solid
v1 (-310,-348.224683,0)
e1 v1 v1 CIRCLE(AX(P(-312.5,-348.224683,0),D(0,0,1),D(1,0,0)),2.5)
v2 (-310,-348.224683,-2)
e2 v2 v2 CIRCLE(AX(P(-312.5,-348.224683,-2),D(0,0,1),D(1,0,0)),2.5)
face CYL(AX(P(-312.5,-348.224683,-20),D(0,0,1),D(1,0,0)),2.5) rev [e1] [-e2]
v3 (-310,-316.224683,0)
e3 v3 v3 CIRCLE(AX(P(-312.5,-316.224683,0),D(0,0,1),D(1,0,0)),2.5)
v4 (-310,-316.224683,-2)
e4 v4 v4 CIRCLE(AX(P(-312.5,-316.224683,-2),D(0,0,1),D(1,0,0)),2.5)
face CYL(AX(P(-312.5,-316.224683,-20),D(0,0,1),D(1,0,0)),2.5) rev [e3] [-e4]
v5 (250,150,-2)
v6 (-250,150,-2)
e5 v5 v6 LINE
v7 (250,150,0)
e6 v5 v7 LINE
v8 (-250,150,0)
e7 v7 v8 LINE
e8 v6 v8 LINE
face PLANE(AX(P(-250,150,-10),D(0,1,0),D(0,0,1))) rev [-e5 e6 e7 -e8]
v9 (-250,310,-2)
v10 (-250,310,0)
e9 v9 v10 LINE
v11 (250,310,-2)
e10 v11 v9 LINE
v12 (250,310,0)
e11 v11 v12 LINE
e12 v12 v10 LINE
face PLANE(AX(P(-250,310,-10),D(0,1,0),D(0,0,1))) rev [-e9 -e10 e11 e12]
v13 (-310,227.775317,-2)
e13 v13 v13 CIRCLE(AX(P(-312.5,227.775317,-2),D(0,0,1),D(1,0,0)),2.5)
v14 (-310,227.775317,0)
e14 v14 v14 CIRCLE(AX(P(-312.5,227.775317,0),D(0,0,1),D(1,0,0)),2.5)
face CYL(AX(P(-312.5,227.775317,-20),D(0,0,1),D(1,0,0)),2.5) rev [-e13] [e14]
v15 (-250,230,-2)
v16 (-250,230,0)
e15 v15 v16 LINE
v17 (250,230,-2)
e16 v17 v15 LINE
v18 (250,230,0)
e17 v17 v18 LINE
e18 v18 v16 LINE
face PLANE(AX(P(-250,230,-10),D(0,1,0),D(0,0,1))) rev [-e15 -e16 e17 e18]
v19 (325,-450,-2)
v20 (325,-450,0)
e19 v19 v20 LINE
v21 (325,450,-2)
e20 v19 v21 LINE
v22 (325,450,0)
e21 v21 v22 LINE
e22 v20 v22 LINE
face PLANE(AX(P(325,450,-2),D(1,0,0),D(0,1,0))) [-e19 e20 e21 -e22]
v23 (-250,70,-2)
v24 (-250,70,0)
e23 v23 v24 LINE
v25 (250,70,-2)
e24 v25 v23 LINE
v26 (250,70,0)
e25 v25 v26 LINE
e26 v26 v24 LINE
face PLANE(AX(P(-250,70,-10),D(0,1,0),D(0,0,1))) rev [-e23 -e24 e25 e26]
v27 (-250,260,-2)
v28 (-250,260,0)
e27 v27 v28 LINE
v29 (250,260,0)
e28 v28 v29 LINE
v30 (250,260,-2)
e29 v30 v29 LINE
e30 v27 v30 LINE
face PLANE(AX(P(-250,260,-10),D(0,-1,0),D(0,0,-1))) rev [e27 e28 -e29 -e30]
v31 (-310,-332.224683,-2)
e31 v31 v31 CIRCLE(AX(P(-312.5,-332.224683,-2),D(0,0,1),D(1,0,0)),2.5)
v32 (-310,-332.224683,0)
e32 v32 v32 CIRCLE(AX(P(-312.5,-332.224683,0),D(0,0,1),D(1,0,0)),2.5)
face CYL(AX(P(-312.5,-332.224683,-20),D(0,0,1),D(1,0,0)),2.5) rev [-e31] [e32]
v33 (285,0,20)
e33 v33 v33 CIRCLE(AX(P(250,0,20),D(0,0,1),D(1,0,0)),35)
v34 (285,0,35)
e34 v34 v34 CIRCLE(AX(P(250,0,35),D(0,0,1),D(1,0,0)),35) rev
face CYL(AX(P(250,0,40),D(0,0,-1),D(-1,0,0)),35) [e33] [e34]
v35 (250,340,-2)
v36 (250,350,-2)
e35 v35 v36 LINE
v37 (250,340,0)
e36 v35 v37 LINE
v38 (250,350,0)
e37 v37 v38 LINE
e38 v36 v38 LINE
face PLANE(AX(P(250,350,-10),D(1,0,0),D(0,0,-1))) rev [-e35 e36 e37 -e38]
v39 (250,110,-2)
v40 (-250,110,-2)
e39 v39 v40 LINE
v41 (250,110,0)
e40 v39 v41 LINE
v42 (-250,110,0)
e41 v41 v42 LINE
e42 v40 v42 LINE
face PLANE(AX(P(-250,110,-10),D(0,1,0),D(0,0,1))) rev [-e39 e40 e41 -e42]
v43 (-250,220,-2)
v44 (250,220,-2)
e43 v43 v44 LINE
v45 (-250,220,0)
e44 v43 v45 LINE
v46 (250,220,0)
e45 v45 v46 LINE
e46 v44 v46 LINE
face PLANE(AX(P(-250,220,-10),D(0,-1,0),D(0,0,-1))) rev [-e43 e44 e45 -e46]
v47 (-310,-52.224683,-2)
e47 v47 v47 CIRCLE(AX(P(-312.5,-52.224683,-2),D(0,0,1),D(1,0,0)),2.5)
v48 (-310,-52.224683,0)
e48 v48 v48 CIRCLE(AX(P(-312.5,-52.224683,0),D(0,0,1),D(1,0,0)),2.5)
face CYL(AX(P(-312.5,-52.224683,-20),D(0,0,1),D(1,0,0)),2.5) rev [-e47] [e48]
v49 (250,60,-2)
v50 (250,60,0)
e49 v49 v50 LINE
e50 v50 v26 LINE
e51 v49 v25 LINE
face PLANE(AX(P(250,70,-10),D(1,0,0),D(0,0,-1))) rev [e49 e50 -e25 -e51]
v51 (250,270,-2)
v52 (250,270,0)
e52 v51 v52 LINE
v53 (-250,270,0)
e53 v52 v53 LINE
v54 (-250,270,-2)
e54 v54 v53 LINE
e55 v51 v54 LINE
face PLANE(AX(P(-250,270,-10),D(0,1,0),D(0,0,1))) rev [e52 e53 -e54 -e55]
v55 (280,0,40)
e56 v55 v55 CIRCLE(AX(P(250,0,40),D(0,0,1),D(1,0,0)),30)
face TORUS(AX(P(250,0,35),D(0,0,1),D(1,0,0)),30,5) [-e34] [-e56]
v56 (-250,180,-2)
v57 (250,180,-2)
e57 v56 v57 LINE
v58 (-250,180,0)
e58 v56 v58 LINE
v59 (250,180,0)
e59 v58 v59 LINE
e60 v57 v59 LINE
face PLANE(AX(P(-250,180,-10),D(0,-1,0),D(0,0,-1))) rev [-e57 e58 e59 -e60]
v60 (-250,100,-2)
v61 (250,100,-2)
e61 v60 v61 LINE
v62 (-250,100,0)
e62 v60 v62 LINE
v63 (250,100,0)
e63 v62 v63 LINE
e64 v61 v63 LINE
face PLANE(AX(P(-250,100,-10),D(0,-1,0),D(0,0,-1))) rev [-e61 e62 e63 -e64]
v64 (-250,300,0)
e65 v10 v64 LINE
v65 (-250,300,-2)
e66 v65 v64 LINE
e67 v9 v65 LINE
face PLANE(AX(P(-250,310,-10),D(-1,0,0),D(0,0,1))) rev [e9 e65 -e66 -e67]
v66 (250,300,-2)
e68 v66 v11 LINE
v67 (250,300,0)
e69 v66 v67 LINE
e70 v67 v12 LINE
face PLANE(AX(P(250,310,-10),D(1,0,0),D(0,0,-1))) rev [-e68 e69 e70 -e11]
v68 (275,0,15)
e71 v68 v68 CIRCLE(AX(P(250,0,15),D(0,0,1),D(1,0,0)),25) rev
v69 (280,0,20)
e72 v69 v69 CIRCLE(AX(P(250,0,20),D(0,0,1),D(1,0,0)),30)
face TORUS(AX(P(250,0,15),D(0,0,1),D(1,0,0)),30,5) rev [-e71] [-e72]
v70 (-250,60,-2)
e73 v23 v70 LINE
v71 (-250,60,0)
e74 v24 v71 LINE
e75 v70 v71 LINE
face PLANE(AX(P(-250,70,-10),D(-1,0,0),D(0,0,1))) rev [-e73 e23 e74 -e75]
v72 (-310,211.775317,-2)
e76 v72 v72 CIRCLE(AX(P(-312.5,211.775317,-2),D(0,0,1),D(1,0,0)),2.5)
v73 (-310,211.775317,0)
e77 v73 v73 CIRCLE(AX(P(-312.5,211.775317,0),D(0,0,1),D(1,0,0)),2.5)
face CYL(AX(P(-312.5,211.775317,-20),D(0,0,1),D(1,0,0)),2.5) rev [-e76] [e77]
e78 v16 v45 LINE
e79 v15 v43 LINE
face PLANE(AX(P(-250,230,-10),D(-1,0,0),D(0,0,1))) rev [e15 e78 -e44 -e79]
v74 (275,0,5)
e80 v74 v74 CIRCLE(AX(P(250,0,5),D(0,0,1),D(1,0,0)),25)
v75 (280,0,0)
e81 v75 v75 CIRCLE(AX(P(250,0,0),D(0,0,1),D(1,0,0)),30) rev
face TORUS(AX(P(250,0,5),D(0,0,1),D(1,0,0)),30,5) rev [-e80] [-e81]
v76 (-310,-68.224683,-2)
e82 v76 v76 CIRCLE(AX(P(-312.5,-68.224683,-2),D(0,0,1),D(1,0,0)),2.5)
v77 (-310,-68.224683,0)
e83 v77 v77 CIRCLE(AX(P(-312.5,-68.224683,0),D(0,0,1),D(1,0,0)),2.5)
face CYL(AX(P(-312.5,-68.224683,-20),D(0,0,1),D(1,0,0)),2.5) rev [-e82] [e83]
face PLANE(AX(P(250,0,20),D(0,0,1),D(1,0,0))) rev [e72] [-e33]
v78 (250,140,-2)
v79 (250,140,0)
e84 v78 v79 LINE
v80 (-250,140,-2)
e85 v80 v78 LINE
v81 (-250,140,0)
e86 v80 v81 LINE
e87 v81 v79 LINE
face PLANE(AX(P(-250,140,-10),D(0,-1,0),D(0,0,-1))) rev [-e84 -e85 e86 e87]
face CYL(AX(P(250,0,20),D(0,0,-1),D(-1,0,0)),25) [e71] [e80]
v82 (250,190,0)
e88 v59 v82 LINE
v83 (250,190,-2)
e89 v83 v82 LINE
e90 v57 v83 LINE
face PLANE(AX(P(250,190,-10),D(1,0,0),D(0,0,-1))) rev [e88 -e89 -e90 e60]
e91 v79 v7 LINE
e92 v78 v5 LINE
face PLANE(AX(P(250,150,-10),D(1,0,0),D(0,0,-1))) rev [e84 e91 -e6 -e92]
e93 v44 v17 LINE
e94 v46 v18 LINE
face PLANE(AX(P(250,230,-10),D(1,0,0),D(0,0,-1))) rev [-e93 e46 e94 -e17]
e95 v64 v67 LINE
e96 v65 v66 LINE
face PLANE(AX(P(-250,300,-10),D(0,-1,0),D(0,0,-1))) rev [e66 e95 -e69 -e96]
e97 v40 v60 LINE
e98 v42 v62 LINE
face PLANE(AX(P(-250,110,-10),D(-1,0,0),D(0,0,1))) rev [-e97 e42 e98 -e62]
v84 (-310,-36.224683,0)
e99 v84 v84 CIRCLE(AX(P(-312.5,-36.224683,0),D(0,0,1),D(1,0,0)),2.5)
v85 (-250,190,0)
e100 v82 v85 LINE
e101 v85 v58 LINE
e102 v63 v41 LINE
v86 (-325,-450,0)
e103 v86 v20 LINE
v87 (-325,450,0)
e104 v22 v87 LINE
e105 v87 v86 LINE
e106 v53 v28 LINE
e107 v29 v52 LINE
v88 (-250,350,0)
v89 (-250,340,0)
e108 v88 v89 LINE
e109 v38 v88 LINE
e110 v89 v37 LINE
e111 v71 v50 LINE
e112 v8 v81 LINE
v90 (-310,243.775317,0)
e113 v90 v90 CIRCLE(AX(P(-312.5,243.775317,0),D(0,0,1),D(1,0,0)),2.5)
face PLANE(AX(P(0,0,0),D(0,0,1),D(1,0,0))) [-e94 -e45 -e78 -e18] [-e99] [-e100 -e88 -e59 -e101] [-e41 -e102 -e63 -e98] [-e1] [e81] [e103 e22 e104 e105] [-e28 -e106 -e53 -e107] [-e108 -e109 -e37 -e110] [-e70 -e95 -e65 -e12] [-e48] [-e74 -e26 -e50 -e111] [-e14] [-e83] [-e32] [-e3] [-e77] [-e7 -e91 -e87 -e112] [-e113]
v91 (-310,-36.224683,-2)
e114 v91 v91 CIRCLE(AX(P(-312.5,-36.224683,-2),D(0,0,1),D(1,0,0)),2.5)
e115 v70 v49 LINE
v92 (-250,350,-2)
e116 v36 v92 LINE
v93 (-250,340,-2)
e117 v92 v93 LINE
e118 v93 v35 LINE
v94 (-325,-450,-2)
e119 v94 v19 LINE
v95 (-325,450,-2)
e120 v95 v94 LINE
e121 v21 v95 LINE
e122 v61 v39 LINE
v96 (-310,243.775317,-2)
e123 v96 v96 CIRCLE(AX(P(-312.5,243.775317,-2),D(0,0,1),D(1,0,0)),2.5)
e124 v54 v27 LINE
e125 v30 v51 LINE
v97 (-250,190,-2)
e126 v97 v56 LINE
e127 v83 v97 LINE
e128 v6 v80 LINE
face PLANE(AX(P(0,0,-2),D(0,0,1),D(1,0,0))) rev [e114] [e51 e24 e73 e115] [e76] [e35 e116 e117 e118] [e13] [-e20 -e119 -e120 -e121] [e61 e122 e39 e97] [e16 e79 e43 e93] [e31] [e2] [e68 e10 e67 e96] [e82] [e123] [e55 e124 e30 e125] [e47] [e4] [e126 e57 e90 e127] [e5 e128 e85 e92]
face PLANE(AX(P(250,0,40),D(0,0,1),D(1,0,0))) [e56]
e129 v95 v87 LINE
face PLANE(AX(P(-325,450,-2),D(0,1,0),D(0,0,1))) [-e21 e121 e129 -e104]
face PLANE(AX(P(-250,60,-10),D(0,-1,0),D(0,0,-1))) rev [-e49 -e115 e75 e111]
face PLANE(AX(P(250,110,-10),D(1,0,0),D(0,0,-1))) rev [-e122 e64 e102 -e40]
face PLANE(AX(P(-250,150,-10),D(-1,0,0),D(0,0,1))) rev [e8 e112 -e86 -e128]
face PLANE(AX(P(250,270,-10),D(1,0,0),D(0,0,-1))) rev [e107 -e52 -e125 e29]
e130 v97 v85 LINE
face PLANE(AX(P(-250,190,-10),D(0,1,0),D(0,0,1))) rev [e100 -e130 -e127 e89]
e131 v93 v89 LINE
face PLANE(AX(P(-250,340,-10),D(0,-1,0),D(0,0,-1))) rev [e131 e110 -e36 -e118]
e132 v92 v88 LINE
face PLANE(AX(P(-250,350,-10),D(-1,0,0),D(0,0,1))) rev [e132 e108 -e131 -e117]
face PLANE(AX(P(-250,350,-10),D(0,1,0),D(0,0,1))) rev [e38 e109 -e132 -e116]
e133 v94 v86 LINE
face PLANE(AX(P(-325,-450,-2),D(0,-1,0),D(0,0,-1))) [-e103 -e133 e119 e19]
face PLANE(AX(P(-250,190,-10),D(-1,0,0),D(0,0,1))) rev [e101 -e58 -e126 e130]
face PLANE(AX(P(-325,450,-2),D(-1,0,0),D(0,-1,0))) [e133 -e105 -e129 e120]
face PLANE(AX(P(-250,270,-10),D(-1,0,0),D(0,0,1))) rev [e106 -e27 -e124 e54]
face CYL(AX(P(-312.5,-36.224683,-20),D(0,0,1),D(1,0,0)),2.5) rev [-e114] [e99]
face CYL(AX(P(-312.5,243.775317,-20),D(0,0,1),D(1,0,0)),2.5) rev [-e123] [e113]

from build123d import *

# Parameters (mm, degrees)
ESQUISSE1_W               = 650
ESQUISSE1_H               = 900
T_LE_DE_BASE_PLI_E1_DEPTH = 2
ESQUISSE6_W               = 500
ESQUISSE6_H               = 10
ENL_V_MAT_EXTRU_1_DEPTH   = 10
ESQUISSE7_R               = 25
BOSS_EXTRU_1_DEPTH        = 20
ESQUISSE8_R               = 35
BOSS_EXTRU_2_DEPTH        = 20
CONG_1_R                  = 5
ESQUISSE9_R               = 2.5
ENL_V_MAT_EXTRU_2_DEPTH   = 20


# Sheet-metal steps are written as plain solids
with BuildPart() as part:
    # Esquisse1 → Tôle de base pliée1 (new body)
    with BuildSketch(Plane.XY):
        Rectangle(ESQUISSE1_W, ESQUISSE1_H)
    extrude(amount=-T_LE_DE_BASE_PLI_E1_DEPTH)

    # Esquisse6 → Enlèv. mat.-Extru.1 (cut)
    with BuildSketch(Plane.XY):
        with Locations((0, 345)):
            Rectangle(ESQUISSE6_W, ESQUISSE6_H)
        with Locations((0, 305)):
            Rectangle(ESQUISSE6_W, ESQUISSE6_H)
        with Locations((0, 265)):
            Rectangle(ESQUISSE6_W, ESQUISSE6_H)
        with Locations((0, 225)):
            Rectangle(ESQUISSE6_W, ESQUISSE6_H)
        with Locations((0, 185)):
            Rectangle(ESQUISSE6_W, ESQUISSE6_H)
        with Locations((0, 145)):
            Rectangle(ESQUISSE6_W, ESQUISSE6_H)
        with Locations((0, 105)):
            Rectangle(ESQUISSE6_W, ESQUISSE6_H)
        with Locations((0, 65)):
            Rectangle(ESQUISSE6_W, ESQUISSE6_H)
    extrude(amount=-ENL_V_MAT_EXTRU_1_DEPTH, mode=Mode.SUBTRACT)

    # Esquisse7 → Boss.-Extru.1 (add)
    with BuildSketch(Plane.XY):
        with Locations((250, 0)):
            Circle(ESQUISSE7_R)
    extrude(amount=BOSS_EXTRU_1_DEPTH)

    # Esquisse8 → Boss.-Extru.2 (add)
    with BuildSketch(Plane.XY.offset(20)):
        with Locations((250, 0)):
            Circle(ESQUISSE8_R)
    extrude(amount=BOSS_EXTRU_2_DEPTH)

    # Congé1
    cong_1_edges = [part.edges().sort_by_distance(p)[0] for p in [
        (225, 0, 0),
        (225, 0, 20),
        (215, 0, 40),
    ]]
    fillet(cong_1_edges, radius=CONG_1_R)

    # Esquisse9 → Enlèv. mat.-Extru.2 (cut)
    with BuildSketch(Plane.XY):
        with Locations((-312.5, 243.775317496)):
            Circle(ESQUISSE9_R)
        with Locations((-312.5, 227.775317496)):
            Circle(ESQUISSE9_R)
        with Locations((-312.5, 211.775317496)):
            Circle(ESQUISSE9_R)
        with Locations((-312.5, -36.224682504)):
            Circle(ESQUISSE9_R)
        with Locations((-312.5, -52.224682504)):
            Circle(ESQUISSE9_R)
        with Locations((-312.5, -68.224682504)):
            Circle(ESQUISSE9_R)
        with Locations((-312.5, -316.224682504)):
            Circle(ESQUISSE9_R)
        with Locations((-312.5, -332.224682504)):
            Circle(ESQUISSE9_R)
        with Locations((-312.5, -348.224682504)):
            Circle(ESQUISSE9_R)
    extrude(amount=-ENL_V_MAT_EXTRU_2_DEPTH, mode=Mode.SUBTRACT)


solid = part.part
